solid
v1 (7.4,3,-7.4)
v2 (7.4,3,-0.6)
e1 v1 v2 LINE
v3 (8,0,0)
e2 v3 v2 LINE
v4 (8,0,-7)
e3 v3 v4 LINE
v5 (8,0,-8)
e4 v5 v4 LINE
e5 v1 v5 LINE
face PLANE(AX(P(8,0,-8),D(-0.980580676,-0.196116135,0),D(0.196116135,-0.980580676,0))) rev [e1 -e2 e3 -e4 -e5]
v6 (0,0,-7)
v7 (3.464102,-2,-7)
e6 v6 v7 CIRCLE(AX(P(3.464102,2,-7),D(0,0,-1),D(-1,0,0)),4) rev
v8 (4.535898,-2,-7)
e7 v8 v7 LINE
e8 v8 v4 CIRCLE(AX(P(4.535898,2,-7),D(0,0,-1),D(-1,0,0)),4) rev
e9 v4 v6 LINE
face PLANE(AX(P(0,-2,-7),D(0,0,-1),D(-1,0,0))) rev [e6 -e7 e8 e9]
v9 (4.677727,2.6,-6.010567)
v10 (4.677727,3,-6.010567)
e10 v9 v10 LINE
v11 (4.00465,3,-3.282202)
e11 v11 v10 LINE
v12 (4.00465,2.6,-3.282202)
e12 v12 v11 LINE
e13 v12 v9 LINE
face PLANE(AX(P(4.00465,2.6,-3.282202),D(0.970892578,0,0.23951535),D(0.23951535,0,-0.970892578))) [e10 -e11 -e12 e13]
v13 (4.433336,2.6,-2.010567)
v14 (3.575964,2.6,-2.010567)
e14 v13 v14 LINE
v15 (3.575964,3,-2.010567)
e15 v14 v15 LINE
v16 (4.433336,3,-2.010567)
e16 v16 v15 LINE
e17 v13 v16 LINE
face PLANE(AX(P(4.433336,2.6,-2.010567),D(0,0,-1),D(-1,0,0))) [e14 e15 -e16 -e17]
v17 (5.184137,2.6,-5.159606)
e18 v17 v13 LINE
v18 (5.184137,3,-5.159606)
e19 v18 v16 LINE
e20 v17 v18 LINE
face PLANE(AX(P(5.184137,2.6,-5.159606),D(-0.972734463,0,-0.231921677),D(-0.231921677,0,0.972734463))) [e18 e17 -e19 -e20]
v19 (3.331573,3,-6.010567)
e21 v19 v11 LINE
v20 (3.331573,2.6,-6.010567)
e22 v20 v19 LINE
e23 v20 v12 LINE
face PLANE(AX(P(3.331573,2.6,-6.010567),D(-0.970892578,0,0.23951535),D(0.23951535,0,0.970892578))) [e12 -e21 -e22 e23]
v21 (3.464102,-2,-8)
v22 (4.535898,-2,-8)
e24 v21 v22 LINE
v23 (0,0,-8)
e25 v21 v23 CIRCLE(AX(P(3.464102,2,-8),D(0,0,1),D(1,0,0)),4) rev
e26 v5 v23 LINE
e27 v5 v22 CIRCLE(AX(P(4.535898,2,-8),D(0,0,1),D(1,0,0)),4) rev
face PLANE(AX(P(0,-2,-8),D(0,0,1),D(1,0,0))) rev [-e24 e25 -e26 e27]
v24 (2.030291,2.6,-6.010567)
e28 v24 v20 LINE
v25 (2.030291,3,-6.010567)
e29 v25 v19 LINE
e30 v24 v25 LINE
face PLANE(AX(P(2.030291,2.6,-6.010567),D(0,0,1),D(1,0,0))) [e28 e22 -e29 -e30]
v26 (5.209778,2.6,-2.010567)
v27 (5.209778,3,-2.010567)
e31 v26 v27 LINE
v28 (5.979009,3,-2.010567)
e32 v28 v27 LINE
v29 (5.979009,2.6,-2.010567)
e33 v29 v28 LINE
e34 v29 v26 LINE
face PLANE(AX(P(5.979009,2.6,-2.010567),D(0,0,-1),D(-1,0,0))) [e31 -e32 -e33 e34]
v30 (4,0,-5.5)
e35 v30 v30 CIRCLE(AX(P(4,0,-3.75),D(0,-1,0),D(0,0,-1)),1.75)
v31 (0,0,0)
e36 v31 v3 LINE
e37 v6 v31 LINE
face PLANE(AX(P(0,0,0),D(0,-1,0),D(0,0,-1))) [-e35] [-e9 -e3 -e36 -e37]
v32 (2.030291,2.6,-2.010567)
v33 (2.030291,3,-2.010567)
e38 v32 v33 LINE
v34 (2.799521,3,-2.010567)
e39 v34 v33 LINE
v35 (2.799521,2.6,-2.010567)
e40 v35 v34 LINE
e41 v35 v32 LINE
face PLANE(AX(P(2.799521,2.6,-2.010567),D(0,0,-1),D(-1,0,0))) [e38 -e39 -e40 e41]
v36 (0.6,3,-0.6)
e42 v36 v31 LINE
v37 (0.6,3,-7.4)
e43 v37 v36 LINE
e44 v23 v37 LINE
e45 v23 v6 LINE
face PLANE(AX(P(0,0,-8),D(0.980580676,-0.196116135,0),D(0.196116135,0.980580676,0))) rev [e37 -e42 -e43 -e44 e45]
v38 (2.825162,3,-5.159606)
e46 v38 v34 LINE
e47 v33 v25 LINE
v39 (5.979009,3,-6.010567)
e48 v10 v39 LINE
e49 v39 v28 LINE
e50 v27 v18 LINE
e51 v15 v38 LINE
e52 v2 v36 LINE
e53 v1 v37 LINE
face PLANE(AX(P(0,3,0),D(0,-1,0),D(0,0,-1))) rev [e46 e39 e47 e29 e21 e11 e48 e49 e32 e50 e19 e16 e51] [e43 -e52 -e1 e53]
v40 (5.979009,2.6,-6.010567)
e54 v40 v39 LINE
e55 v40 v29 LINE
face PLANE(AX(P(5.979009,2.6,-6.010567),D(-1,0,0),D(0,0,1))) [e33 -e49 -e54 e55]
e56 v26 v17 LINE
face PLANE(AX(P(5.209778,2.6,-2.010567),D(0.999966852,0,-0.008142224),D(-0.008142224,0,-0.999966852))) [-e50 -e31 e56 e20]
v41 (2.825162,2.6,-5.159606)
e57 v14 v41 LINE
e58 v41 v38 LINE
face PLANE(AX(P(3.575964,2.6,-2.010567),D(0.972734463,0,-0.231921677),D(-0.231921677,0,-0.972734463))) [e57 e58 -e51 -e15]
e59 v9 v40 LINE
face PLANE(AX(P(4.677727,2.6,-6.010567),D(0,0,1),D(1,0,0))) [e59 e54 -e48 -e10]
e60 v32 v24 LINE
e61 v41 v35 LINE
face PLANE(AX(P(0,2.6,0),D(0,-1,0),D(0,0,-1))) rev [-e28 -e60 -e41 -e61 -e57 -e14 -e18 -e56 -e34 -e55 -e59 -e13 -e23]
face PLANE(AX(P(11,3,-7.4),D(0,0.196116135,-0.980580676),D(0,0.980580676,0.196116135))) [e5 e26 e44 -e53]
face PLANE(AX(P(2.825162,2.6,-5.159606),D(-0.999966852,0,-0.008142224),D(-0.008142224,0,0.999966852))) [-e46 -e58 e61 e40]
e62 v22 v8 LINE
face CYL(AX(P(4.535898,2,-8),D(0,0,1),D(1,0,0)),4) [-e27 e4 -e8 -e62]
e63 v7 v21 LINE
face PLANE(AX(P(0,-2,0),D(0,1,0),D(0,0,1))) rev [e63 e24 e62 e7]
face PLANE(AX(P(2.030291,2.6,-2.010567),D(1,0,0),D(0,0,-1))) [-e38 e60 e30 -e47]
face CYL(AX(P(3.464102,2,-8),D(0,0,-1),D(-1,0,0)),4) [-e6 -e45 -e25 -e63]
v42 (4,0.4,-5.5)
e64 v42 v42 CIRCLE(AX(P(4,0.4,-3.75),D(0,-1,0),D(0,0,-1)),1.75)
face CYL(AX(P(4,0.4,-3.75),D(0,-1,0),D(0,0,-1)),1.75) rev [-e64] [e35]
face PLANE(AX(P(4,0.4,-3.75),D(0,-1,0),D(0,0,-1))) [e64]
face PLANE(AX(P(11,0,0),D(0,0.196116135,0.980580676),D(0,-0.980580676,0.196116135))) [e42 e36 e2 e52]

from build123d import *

# Parameters (mm, degrees)
SKETCH1_W               = 8
SKETCH1_H               = 8
BOSS_EXTRUDE1_DEPTH     = 3
CUT_EXTRUDE1_DEPTH      = 12.704699911
CUT_EXTRUDE1_DEPTH_BACK = 12.704699911
CUT_EXTRUDE2_DEPTH      = 11
SKETCH4_R               = 1.75
CUT_EXTRUDE3_DEPTH      = 0.4
SKETCH5_W               = 8
SKETCH5_H               = 1
BOSS_EXTRUDE2_DEPTH     = 2
FILLET1_R               = 4
CUT_EXTRUDE4_DEPTH      = 0.4


with BuildPart() as part:
    # Sketch1 → Boss-Extrude1 (new body)
    with BuildSketch(Plane(origin=(0, 0, 0), x_dir=(1, 0, 0), z_dir=(0, 1, 0))):
        with Locations((4, 4)):
            Rectangle(SKETCH1_W, SKETCH1_H)
    extrude(amount=BOSS_EXTRUDE1_DEPTH)

    # Sketch2 → Cut-Extrude1 (cut, two sides: drawn at the far end of the back side and taken through both)
    with BuildSketch(Plane.XY.offset(-CUT_EXTRUDE1_DEPTH_BACK)):
        Polygon((0, 0), (0.6, 3), (0, 3), align=None)
        Polygon((8, 0), (7.4, 3), (8, 3), align=None)
    extrude(amount=CUT_EXTRUDE1_DEPTH + CUT_EXTRUDE1_DEPTH_BACK, mode=Mode.SUBTRACT)

    # Sketch3 → Cut-Extrude2 (cut)
    with BuildSketch(Plane(origin=(0, 0, 0), x_dir=(0, 0, -1), z_dir=(1, 0, 0))):
        Polygon((0, 0), (0.6, 3), (0, 3), align=None)
        Polygon((8, 3), (7.4, 3), (8, 0), align=None)
    extrude(amount=CUT_EXTRUDE2_DEPTH, mode=Mode.SUBTRACT)

    # Sketch4 → Cut-Extrude3 (cut)
    with BuildSketch(Plane.XZ):
        with Locations(Location((4, -3.75, 0), (0, 0, 270))):
            Circle(SKETCH4_R)
    extrude(amount=-CUT_EXTRUDE3_DEPTH, mode=Mode.SUBTRACT)

    # Sketch5 → Boss-Extrude2 (add)
    with BuildSketch(Plane.XZ):
        with Locations((4, -7.5)):
            Rectangle(SKETCH5_W, SKETCH5_H)
    extrude(amount=BOSS_EXTRUDE2_DEPTH)

    # Fillet1
    # the kernel refuses this fillet: 4 mm, written as the material it takes off along each edge
    with BuildSketch(Plane(origin=(8, -2, -16.660254038), x_dir=(0, 1, 0), z_dir=(0, 0, 1)), Plane(origin=(0, -2, 1.660254038), x_dir=(0, 1, 0), z_dir=(0, 0, -1))) as fillet1_piece_1:
        with BuildLine():
            CenterArc((4, 3.464101615), FILLET1_R, 180, 60)
            Line((0, 3.464101615), (-0.08, 3.464101615))
            Line((-0.08, 3.464101615), (-0.08, 0))
            Line((-0.08, 0), (0, -0.08))
            ThreePointArc((0, -0.08), (1, -0.08), (1.96, -0.069282032))
            Line((1.96, -0.069282032), (2, 0))
        make_face()
    extrude(amount=18.320508076, mode=Mode.SUBTRACT)

    # Sketch6 → Cut-Extrude4 (cut)
    with BuildSketch(Plane(origin=(0, 3, 0), x_dir=(1, 0, 0), z_dir=(0, 1, 0))):
        Polygon((2.030290665, 2.010567225), (2.030290665, 6.010567225), (3.331572716, 6.010567225), (4.004649639, 3.28220184), (4.677726562, 6.010567225), (5.979008613, 6.010567225), (5.979008613, 2.010567225), (5.209777844, 2.010567225), (5.184136818, 5.159605686), (4.433335536, 2.010567225), (3.575963742, 2.010567225), (2.82516246, 5.159605686), (2.799521434, 2.010567225), align=None)
    extrude(amount=-CUT_EXTRUDE4_DEPTH, mode=Mode.SUBTRACT)


solid = part.part
